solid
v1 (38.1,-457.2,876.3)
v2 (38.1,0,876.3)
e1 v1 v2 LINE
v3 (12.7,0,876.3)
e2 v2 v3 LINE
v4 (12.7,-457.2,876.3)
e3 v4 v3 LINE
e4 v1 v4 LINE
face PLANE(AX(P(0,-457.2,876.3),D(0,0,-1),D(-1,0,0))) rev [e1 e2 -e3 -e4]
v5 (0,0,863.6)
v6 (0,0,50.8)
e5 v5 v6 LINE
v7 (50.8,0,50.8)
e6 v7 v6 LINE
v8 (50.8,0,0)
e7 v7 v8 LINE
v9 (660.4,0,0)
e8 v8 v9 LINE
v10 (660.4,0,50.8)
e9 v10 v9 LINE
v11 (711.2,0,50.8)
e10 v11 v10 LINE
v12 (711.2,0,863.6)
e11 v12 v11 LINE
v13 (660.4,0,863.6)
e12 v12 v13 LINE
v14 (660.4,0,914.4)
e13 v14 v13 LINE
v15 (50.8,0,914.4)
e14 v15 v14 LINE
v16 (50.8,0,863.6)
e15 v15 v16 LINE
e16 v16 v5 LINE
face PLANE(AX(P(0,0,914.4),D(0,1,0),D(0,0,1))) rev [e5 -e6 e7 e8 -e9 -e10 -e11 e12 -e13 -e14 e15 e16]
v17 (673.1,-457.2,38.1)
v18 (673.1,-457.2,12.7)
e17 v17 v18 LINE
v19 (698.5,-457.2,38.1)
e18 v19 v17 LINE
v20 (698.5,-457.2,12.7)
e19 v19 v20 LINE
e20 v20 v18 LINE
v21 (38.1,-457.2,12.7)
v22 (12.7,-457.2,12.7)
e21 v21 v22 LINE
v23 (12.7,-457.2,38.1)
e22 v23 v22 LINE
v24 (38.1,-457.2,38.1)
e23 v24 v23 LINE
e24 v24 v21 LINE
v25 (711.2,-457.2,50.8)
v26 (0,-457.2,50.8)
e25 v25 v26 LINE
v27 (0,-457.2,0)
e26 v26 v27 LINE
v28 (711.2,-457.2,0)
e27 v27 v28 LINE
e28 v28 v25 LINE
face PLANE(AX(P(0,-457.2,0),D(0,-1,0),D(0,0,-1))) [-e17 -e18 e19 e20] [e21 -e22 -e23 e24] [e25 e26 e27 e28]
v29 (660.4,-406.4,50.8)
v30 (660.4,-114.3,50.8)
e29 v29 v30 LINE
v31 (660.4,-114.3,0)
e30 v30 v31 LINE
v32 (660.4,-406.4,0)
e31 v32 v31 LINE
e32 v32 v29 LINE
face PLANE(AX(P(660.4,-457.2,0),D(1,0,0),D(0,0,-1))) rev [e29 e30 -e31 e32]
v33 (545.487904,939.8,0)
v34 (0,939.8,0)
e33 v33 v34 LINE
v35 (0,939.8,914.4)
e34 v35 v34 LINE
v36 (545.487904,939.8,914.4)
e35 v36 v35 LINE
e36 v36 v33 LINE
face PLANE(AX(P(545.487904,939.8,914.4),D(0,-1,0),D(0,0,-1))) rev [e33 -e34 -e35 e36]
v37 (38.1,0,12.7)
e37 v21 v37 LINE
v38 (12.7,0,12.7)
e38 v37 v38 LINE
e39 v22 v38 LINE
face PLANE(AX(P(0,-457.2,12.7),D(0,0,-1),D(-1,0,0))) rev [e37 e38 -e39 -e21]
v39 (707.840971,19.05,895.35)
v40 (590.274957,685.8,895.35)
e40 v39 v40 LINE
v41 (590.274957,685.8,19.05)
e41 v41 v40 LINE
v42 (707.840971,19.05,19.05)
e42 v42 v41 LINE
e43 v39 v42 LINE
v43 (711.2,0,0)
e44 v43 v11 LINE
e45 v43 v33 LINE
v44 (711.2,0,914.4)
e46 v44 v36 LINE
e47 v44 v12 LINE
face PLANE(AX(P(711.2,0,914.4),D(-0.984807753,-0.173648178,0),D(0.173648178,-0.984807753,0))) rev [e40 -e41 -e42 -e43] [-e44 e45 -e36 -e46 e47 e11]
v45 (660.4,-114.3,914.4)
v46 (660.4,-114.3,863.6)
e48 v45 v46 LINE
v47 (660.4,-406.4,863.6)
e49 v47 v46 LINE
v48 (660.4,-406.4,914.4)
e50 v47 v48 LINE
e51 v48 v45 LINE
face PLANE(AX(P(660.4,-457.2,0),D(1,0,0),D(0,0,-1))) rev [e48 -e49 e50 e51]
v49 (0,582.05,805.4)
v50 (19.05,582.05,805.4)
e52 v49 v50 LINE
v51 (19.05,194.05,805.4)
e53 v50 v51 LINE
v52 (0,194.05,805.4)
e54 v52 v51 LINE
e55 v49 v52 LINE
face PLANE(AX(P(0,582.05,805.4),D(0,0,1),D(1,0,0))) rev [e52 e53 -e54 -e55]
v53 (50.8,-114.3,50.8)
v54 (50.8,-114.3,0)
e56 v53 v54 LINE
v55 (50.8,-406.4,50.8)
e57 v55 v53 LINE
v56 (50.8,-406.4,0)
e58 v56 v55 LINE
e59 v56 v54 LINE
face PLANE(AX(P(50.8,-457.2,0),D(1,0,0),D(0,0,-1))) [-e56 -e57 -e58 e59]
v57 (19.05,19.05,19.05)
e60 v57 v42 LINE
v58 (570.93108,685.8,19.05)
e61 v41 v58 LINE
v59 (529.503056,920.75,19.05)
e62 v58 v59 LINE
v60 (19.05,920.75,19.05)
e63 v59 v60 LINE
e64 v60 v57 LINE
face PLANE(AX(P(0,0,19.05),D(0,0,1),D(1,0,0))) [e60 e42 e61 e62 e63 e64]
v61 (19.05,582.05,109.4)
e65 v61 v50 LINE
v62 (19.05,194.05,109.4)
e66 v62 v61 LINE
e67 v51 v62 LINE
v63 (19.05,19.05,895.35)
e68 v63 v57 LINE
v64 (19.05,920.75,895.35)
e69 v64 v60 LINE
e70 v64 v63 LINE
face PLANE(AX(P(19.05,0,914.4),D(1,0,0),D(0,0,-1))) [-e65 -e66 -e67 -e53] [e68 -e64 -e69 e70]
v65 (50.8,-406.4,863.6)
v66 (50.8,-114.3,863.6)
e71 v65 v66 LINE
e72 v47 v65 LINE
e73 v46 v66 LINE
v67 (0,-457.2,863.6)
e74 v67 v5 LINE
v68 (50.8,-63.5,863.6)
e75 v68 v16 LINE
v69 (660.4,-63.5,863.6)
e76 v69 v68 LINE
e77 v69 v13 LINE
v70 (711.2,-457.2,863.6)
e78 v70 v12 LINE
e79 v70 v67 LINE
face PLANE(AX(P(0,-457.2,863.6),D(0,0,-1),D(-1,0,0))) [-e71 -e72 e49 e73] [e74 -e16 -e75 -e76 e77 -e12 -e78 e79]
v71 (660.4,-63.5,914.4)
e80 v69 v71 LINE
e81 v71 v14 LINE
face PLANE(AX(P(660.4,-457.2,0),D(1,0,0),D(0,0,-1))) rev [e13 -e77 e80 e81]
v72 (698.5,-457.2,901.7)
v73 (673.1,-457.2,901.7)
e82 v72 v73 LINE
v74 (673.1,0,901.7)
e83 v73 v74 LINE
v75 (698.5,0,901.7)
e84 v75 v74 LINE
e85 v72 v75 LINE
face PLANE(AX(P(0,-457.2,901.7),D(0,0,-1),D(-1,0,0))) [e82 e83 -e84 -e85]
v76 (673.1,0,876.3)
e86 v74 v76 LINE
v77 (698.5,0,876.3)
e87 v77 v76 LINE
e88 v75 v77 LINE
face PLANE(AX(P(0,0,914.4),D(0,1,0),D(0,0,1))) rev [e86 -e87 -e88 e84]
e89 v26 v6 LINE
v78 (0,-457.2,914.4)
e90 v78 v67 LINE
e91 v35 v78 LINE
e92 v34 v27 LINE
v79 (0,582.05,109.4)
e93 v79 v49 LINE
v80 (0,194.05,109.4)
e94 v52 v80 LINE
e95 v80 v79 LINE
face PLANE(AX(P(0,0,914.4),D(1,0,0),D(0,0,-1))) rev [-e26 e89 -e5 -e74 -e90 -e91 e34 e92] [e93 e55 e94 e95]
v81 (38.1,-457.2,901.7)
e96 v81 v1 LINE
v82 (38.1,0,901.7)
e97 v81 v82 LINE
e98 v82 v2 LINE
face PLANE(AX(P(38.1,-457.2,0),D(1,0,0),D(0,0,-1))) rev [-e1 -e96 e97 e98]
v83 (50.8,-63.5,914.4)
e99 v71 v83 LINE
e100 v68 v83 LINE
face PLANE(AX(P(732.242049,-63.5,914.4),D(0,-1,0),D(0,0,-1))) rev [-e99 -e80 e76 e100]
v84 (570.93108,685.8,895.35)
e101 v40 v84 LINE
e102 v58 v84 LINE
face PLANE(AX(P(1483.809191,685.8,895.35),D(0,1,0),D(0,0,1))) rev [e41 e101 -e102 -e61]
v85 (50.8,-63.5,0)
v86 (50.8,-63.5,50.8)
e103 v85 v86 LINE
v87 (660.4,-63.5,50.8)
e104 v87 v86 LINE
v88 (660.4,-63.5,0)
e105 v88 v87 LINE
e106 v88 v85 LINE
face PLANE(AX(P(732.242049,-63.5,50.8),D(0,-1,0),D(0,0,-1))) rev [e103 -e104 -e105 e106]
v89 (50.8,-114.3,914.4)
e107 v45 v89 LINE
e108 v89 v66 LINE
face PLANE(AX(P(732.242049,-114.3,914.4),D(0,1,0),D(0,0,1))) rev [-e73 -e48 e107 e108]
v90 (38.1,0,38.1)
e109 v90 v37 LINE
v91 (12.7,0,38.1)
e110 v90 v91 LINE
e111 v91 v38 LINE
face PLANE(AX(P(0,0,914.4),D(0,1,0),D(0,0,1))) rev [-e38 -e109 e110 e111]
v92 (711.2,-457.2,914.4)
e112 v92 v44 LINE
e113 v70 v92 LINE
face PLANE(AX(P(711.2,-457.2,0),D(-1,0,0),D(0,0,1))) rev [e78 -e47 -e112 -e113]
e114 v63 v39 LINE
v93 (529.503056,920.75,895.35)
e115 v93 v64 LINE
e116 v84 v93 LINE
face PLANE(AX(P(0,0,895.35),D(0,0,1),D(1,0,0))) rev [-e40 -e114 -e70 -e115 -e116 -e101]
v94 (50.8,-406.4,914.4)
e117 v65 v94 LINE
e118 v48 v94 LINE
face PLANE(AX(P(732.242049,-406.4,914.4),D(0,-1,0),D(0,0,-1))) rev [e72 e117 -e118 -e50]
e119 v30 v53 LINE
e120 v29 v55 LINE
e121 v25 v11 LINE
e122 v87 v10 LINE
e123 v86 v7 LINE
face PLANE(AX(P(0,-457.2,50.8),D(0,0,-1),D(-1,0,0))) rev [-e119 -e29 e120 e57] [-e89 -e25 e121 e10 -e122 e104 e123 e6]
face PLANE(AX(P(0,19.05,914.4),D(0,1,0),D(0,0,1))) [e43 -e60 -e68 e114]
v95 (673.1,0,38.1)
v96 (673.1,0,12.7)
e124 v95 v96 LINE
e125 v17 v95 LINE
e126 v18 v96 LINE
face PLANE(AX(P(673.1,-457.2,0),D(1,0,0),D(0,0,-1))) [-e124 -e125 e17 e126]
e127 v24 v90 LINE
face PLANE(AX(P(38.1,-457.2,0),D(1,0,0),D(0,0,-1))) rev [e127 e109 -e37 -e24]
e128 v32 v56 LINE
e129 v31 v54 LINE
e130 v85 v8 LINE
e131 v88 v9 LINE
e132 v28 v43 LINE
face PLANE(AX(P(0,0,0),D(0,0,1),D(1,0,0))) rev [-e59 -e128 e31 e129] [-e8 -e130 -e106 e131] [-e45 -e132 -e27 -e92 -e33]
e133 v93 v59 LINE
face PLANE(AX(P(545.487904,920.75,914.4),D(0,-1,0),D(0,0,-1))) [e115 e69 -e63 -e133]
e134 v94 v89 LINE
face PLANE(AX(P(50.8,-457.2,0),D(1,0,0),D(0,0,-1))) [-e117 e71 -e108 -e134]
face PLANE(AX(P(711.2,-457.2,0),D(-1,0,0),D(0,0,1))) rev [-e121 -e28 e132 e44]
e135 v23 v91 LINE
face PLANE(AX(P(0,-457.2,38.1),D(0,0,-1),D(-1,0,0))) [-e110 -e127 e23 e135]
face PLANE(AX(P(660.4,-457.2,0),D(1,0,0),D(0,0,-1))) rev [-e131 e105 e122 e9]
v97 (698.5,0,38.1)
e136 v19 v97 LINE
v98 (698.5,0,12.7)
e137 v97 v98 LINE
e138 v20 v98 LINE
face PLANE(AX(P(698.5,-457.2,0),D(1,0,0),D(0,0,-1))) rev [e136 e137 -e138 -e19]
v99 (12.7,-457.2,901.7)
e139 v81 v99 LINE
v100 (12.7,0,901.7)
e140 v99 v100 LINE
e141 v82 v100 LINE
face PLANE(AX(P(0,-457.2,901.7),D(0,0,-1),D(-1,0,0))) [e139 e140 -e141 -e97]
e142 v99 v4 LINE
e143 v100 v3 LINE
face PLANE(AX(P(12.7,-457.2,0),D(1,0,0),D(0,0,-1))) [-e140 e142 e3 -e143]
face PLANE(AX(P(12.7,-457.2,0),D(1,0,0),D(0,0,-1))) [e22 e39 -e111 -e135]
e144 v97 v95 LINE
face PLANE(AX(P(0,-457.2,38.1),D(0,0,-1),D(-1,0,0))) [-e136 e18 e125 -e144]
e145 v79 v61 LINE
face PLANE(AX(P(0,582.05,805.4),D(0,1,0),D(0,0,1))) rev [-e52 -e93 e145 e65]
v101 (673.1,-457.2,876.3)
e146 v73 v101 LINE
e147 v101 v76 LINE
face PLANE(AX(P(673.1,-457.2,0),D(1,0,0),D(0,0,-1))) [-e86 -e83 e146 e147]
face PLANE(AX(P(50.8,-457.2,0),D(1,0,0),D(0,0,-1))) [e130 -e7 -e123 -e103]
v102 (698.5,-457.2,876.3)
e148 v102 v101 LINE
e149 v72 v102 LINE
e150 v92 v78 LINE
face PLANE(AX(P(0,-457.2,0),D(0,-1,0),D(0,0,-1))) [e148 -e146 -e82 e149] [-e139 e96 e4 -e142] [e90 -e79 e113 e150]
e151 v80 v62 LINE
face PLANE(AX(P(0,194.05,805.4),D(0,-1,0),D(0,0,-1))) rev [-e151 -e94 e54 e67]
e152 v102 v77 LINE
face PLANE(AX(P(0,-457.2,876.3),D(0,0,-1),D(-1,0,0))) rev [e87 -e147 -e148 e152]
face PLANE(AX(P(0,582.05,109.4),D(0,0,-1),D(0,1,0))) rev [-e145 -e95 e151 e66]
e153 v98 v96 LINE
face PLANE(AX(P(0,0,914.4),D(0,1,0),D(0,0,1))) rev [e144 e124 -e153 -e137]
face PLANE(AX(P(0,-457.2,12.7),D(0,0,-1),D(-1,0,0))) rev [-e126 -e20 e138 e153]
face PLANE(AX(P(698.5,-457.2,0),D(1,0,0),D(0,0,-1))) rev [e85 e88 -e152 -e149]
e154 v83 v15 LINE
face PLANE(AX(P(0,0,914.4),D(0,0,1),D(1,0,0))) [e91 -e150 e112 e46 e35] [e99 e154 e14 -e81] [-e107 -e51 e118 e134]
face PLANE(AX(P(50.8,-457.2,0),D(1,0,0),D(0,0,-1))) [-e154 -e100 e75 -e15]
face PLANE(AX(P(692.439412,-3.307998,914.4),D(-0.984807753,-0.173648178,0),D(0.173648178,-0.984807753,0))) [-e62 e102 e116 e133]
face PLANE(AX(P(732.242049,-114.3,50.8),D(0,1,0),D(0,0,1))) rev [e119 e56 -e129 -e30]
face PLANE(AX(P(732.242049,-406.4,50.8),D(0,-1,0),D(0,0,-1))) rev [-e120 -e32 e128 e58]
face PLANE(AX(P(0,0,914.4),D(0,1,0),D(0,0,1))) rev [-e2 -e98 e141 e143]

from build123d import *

# Parameters (mm, degrees)
BOSS_EXTRUDE1_DEPTH     = 914.4
SHELL1_T                = -19.05
BOSS_EXTRUDE2_REACH     = 1484.708
SKETCH2_W               = 876.3
SKETCH2_H               = 234.95
SHELL2_START            = 19.05
SHELL2_DEPTH            = 876.3
SKETCH6_W               = 50.8
SKETCH6_H               = 50.8
SKETCH6_W_2             = 25.4
SKETCH6_H_2             = 25.4
BOSS_EXTRUDE3_DEPTH     = 457.2
SKETCH7_W               = 50.8
SKETCH7_H               = 50.8
BOSS_EXTRUDE4_DEPTH     = 609.6
CUT_EXTRUDE2_DEPTH      = 1483.708003115
CUT_EXTRUDE2_DEPTH_BACK = 1483.708003115
SKETCH9_W               = 696
SKETCH9_H               = 388


# Read off the part's stored shape, not the designer's step: Shell2
with BuildPart() as part:
    # Sketch1 → Boss-Extrude1 (new body)
    with BuildSketch(Plane.XY):
        Polygon((0, 0), (711.2, 0), (545.48790353, 939.8), (0, 939.8), align=None)
    extrude(amount=BOSS_EXTRUDE1_DEPTH)

    # Shell1
    shell1_openings = [part.faces().sort_by_distance(p)[0] for p in [
        (628.343951765, 469.9, 457.2),
    ]]
    offset(amount=SHELL1_T, openings=shell1_openings, kind=Kind.INTERSECTION)

    # Boss-Extrude2: up to this plane
    boss_extrude2_end = Plane(origin=(711.2, 0, 914.4), z_dir=(-0.9848077530122075, -0.1736481776669338, 0))
    # Sketch2 → Boss-Extrude2 (add, up to the surface)
    with BuildSketch(Plane(origin=(19.05, 0, 0), x_dir=(0, 0, -1), z_dir=(1, 0, 0)), mode=Mode.PRIVATE) as boss_extrude2_sk1:
        with Locations((-457.2, 803.275)):
            Rectangle(SKETCH2_W, SKETCH2_H)
    boss_extrude2_tool1 = split(extrude(boss_extrude2_sk1.sketch, amount=BOSS_EXTRUDE2_REACH, mode=Mode.PRIVATE), bisect_by=boss_extrude2_end, keep=Keep.BOTH, mode=Mode.PRIVATE)
    add(boss_extrude2_tool1.solids().sort_by_distance((19.05, 803.275, 457.2))[0])

    # Shell2 outline → Shell2 (cut)
    with BuildSketch(Plane.XY.offset(SHELL2_START)):
        Polygon((19.05, 920.75), (19.05, 685.8), (570.931079674, 685.8), (529.503055556, 920.75), align=None)
    extrude(amount=SHELL2_DEPTH, mode=Mode.SUBTRACT)

    # Sketch6 → Boss-Extrude3 (add)
    # profile 1 of 4: a face of its own
    with BuildSketch(Plane.XZ):
        with Locations((685.8, 889)):
            Rectangle(SKETCH6_W, SKETCH6_H)
        with Locations((685.8, 889)):
            Rectangle(SKETCH6_W_2, SKETCH6_H_2, mode=Mode.SUBTRACT)
    # profile 2 of 4: a face of its own
    with BuildSketch(Plane.XZ):
        with Locations((685.8, 25.4)):
            Rectangle(SKETCH6_W, SKETCH6_H)
        with Locations((685.8, 25.4)):
            Rectangle(SKETCH6_W_2, SKETCH6_H_2, mode=Mode.SUBTRACT)
    # profile 3 of 4: a face of its own
    with BuildSketch(Plane.XZ):
        with Locations((25.4, 25.4)):
            Rectangle(SKETCH6_W, SKETCH6_H)
        with Locations((25.4, 25.4)):
            Rectangle(SKETCH6_W_2, SKETCH6_H_2, mode=Mode.SUBTRACT)
    # profile 4 of 4: a face of its own
    with BuildSketch(Plane.XZ):
        with Locations((25.4, 889)):
            Rectangle(SKETCH6_W, SKETCH6_H)
        with Locations((25.4, 889)):
            Rectangle(SKETCH6_W_2, SKETCH6_H_2, mode=Mode.SUBTRACT)
    extrude(amount=BOSS_EXTRUDE3_DEPTH)

    # Sketch7 → Boss-Extrude4 (add)
    with BuildSketch(Plane(origin=(50.8, 0, 0), x_dir=(0, 0, -1), z_dir=(1, 0, 0))):
        with Locations((-889, -431.8)):
            Rectangle(SKETCH7_W, SKETCH7_H)
        with Locations((-25.4, -431.8)):
            Rectangle(SKETCH7_W, SKETCH7_H)
        with Locations((-889, -88.9)):
            Rectangle(SKETCH7_W, SKETCH7_H)
        with Locations((-25.4, -88.9)):
            Rectangle(SKETCH7_W, SKETCH7_H)
    extrude(amount=BOSS_EXTRUDE4_DEPTH)

    # Sketch9 → Cut-Extrude2 (cut, two sides: drawn at the far end of the back side and taken through both)
    with BuildSketch(Plane(origin=(19.05, 0, 0), x_dir=(0, 0, -1), z_dir=(1, 0, 0)).offset(-CUT_EXTRUDE2_DEPTH_BACK)):
        with Locations((-457.4, 388.05)):
            Rectangle(SKETCH9_W, SKETCH9_H)
    extrude(amount=CUT_EXTRUDE2_DEPTH + CUT_EXTRUDE2_DEPTH_BACK, mode=Mode.SUBTRACT)


solid = part.part
